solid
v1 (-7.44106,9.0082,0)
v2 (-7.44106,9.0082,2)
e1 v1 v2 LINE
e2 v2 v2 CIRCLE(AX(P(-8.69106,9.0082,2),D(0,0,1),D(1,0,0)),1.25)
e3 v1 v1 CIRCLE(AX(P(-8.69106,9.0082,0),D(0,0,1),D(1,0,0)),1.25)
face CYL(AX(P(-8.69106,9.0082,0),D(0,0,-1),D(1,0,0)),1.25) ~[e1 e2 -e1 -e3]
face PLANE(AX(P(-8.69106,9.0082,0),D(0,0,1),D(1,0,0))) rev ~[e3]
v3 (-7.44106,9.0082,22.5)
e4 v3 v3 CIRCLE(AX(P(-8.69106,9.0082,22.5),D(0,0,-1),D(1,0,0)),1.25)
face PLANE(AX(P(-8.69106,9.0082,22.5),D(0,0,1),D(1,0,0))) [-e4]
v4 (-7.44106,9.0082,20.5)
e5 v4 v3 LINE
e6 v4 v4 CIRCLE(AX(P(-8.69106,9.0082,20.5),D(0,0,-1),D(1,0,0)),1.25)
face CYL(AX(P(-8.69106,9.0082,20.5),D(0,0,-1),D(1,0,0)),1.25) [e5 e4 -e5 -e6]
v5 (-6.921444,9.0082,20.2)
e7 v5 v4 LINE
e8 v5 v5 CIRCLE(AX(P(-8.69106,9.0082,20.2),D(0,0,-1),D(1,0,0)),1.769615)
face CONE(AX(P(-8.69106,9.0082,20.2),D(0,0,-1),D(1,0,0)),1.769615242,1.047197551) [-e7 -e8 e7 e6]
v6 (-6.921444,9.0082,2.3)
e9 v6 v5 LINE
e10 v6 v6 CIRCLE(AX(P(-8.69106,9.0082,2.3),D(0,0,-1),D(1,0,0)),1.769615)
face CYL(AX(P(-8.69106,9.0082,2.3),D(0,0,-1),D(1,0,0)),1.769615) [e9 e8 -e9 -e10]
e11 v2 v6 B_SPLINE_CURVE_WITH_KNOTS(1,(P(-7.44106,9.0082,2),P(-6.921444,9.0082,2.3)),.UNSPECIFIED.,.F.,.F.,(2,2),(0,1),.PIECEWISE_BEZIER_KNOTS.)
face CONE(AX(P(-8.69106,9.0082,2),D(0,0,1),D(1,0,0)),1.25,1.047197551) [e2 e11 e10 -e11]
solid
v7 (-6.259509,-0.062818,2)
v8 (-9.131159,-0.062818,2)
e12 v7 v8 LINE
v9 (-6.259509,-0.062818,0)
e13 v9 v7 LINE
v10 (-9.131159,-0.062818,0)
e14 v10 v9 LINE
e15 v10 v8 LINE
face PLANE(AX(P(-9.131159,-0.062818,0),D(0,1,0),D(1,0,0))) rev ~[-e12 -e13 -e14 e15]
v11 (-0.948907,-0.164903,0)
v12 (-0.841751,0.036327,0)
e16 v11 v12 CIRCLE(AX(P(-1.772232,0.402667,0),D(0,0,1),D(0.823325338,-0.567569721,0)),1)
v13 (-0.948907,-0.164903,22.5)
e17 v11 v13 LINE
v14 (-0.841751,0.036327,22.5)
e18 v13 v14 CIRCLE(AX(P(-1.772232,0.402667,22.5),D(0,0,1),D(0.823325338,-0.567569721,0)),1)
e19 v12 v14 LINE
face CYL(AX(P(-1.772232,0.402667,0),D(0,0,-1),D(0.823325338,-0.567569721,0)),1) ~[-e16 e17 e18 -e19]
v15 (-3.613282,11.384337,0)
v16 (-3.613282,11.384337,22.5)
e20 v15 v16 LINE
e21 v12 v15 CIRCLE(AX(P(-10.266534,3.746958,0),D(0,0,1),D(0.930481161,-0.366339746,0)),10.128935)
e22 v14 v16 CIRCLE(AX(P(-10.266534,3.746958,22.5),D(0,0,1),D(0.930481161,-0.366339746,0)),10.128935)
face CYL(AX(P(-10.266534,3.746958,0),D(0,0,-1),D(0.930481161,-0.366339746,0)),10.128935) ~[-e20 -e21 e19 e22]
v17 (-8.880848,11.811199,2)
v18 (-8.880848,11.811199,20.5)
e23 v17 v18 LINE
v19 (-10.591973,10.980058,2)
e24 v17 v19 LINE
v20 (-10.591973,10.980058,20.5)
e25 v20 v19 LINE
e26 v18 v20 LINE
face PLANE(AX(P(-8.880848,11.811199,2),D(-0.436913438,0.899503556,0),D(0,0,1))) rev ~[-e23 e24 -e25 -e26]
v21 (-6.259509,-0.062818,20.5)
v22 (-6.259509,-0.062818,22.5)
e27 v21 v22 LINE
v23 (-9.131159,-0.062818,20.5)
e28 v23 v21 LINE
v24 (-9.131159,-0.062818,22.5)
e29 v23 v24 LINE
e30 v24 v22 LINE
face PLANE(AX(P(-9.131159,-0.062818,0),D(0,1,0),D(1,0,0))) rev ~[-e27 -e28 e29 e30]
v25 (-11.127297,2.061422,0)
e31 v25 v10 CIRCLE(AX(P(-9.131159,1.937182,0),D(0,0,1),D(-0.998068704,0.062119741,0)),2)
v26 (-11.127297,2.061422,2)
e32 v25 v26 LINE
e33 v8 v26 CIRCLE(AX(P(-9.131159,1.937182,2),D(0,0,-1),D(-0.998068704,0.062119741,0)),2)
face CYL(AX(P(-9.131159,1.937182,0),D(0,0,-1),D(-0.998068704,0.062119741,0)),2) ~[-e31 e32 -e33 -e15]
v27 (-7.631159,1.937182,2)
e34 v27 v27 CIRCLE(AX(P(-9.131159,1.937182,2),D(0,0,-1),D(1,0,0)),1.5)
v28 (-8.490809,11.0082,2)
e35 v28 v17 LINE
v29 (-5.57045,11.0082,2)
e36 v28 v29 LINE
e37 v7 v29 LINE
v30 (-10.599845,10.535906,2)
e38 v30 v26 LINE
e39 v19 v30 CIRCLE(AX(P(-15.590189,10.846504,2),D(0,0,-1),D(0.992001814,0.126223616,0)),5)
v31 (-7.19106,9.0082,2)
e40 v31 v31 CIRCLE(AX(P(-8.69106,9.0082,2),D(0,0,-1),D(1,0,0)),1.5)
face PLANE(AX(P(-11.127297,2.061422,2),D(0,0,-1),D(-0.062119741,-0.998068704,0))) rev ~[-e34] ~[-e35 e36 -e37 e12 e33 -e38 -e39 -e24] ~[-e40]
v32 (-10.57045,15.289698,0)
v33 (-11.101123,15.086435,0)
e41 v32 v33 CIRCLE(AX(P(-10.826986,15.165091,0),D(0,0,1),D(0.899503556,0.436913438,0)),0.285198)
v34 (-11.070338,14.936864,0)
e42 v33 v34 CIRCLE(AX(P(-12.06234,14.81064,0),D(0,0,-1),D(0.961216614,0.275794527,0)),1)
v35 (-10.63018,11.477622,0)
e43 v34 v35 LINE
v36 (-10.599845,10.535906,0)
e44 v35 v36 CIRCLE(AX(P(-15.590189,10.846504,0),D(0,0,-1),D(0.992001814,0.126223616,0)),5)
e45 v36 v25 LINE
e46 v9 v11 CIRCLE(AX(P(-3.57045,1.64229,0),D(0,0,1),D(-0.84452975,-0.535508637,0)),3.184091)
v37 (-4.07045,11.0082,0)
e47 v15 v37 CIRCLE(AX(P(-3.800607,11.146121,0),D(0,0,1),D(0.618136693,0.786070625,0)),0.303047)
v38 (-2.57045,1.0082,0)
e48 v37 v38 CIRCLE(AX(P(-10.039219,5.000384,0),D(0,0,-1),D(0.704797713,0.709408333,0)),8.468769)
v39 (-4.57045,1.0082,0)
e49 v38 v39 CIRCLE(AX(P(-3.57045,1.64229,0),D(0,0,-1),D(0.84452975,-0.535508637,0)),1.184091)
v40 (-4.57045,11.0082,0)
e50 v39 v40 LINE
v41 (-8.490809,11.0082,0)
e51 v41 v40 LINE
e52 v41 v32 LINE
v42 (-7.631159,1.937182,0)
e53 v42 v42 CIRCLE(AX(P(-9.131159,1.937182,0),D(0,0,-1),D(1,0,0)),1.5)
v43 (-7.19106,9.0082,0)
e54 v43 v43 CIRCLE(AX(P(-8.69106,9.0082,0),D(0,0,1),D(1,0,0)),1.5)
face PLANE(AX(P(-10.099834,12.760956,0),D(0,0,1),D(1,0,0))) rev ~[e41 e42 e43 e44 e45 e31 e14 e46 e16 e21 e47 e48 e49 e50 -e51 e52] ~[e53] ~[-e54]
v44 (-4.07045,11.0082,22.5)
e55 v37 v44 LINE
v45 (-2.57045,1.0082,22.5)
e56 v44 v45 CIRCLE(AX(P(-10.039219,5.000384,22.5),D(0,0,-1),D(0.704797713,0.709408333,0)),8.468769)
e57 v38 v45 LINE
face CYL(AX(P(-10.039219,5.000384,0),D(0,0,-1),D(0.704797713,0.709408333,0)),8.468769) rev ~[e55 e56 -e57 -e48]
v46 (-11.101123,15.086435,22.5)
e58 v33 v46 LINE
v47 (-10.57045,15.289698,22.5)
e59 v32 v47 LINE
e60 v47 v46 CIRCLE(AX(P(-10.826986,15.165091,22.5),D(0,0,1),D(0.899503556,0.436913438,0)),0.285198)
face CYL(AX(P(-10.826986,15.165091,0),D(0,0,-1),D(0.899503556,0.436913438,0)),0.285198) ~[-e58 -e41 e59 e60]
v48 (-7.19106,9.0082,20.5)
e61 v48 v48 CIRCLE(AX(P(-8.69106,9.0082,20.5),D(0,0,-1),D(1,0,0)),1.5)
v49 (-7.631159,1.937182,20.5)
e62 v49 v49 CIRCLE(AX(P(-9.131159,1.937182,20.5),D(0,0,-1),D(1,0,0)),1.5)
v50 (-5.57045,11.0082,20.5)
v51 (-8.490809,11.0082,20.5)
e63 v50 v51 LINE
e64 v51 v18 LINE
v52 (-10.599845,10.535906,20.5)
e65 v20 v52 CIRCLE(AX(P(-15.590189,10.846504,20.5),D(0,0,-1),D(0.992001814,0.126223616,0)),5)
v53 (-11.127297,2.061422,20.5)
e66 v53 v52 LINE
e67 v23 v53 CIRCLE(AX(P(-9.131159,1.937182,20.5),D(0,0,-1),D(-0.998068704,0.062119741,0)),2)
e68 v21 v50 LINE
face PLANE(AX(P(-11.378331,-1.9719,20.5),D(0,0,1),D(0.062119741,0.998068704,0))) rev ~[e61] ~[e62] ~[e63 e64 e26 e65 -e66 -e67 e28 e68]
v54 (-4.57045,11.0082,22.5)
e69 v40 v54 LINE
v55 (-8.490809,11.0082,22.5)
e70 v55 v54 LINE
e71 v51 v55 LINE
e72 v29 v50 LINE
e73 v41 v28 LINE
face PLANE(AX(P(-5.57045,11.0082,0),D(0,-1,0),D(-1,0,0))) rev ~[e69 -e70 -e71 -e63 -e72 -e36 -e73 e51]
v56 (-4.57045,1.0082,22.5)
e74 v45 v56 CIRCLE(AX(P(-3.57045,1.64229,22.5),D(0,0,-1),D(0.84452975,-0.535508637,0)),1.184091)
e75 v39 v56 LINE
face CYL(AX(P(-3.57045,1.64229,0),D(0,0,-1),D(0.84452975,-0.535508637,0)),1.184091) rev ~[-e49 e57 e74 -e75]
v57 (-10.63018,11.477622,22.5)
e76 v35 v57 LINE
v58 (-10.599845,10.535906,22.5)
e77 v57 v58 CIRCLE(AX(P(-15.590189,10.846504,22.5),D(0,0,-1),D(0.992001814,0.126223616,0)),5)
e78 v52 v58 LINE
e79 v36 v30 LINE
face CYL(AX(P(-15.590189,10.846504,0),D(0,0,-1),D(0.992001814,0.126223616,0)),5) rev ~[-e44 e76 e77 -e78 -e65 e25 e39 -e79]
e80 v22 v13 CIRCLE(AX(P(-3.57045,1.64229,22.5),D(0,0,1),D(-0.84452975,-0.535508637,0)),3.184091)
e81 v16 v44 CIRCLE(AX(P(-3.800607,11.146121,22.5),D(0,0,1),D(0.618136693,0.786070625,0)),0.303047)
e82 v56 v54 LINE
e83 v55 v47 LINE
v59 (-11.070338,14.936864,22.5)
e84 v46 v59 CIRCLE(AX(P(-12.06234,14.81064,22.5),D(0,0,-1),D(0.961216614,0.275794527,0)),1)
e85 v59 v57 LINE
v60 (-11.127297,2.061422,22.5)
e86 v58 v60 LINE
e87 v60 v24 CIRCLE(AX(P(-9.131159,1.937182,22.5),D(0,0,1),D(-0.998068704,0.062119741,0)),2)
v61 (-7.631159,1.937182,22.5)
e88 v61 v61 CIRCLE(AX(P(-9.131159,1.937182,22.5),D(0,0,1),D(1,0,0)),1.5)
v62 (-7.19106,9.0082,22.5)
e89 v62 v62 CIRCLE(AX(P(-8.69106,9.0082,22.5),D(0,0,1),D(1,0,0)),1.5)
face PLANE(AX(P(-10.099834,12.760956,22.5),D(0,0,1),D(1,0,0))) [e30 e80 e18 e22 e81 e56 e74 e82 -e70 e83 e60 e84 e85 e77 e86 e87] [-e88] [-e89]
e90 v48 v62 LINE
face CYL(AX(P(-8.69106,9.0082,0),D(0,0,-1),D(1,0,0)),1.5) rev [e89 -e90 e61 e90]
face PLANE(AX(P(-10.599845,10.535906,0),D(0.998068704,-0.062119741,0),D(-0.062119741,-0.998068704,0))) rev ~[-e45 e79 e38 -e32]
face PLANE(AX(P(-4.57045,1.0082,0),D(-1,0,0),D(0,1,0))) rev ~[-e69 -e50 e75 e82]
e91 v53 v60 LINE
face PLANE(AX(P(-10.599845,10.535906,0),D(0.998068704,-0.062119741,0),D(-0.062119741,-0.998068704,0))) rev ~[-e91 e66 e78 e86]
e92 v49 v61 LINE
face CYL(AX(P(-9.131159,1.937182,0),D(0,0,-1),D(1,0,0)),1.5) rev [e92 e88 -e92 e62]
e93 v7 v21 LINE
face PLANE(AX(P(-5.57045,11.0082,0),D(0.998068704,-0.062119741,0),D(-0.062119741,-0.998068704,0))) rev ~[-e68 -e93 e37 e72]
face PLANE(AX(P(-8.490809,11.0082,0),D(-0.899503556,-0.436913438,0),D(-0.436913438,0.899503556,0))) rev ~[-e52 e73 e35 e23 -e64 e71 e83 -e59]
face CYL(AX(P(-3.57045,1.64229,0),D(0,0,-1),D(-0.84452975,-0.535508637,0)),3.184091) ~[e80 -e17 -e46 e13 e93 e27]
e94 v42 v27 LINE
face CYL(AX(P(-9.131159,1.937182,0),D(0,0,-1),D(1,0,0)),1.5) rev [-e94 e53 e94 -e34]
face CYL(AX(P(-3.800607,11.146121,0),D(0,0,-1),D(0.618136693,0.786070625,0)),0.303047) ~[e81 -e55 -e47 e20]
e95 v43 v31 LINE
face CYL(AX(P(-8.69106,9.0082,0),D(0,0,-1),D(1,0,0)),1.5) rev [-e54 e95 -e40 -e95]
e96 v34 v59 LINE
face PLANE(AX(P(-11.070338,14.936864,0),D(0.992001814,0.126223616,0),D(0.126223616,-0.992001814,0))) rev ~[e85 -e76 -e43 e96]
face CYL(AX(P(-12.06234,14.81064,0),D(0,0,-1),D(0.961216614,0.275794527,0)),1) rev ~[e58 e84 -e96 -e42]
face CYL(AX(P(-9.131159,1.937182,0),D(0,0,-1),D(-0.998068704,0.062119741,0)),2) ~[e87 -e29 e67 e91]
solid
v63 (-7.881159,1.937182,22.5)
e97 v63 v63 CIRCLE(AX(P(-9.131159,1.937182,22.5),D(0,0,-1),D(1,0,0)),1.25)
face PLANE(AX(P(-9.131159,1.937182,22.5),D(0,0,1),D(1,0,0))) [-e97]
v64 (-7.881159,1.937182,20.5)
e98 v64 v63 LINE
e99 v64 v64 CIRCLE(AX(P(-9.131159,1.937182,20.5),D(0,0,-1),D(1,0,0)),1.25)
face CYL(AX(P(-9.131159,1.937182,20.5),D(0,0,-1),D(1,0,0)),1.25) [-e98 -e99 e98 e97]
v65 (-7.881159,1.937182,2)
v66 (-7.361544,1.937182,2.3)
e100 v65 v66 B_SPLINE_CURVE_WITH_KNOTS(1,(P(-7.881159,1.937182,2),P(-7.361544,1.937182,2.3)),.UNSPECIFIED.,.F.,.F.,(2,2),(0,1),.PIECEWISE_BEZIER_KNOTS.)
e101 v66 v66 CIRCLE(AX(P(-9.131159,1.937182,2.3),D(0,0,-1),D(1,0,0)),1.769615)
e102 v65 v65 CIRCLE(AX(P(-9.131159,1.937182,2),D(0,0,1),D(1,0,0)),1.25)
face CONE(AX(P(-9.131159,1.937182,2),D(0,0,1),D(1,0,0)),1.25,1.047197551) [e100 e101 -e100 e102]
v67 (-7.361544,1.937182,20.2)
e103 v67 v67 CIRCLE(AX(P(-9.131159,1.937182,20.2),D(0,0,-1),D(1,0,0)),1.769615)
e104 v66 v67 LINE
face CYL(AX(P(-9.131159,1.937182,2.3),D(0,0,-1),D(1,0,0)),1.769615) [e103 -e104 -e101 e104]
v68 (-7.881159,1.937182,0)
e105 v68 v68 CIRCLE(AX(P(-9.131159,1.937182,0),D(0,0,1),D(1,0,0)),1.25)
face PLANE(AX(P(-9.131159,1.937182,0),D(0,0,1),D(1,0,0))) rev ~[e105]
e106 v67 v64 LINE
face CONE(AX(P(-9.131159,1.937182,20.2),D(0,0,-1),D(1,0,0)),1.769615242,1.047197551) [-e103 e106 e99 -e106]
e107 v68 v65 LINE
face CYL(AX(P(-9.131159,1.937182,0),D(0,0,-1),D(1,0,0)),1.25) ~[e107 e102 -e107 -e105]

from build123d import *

# Parameters (mm, degrees)
F0_R      = 1.5
F1_DEPTH  = 22.5
F2_W      = 1.5649868256
F2_H      = 18.5
F2_W_2    = 8.4908823588
F2_H_2    = 2
F2_W_3    = 4.0411260356
F3_DEPTH  = 25
F4_DEPTH  = 22.5
F5_DEPTH  = 2
F0_R_2    = 1.25
F5_FACE_R = 1.25
F6_DEPTH  = 0.3
F6_TAPER  = -60
F7_DEPTH  = 17.9
F7_FACE_R = 1.7696152423
F8_DEPTH  = 0.3
F8_TAPER  = 60
F9_DEPTH  = 2
F10_W     = 0.8927135028
F10_H     = 18.5
F11_DEPTH = 25


with BuildPart() as f1:
    # F0 (on Top) → F1 (new body)
    with BuildSketch(Plane.XY):
        with BuildLine():
            Line((-6.2595093475, -0.0628177289), (-5.5704498465, 11.0081995456))
            Line((-5.5704498465, 11.0081995456), (-8.4908092394, 11.0081995456))
            ThreePointArc((-8.4908092394, 11.0081995456), (-9.5714450422, 10.8886817815), (-10.599845389, 10.5359057038))
            Line((-10.599845389, 10.5359057038), (-11.1272968, 2.0614217526))
            ThreePointArc((-11.1272968, 2.0614217526), (-10.5886364868, 0.5675982034), (-9.1311593921, -0.0628177289))
            Line((-9.1311593921, -0.0628177289), (-6.2595093475, -0.0628177289))
        make_face()
        with Locations((-9.1311593921, 1.9371822711)):
            Circle(F0_R, mode=Mode.SUBTRACT)
        with Locations((-8.6910596692, 9.0081995456)):
            Circle(F0_R, mode=Mode.SUBTRACT)
    extrude(amount=F1_DEPTH)

    # F2 (on face) → F3 (cut)
    with BuildSketch(Plane(origin=(-11.2121657678, 0.6978445754, 0), x_dir=(-0.0621197408, -0.998068704, 0), z_dir=(-0.998068704, 0.0621197408, 0))):
        with Locations((-10.6395915159, 11.25)):
            Rectangle(F2_W, F2_H)
        with Locations((-5.6116569237, 11.25)):
            Rectangle(F2_W_2, F2_H)
        with Locations((-5.6116569237, 1)):
            Rectangle(F2_W_2, F2_H_2)
        with Locations((0.6543472735, 11.25)):
            Rectangle(F2_W_3, F2_H)
    extrude(amount=-F3_DEPTH, mode=Mode.SUBTRACT)

    # F0 (on Top) → F4 (join)
    with BuildSketch(Plane.XY):
        with BuildLine():
            ThreePointArc((-10.599845389, 10.5359057038), (-9.5714450422, 10.8886817815), (-8.4908092394, 11.0081995456))
            Line((-8.4908092394, 11.0081995456), (-10.5704498465, 15.2896977961))
            ThreePointArc((-10.5704498465, 15.2896977961), (-10.9289981735, 15.4314206404), (-11.1011234826, 15.0864349228))
            ThreePointArc((-11.1011234826, 15.0864349228), (-11.0828716583, 15.0122379619), (-11.0703382822, 14.9368640104))
            Line((-11.0703382822, 14.9368640104), (-10.6301798393, 11.4776224879))
            ThreePointArc((-10.6301798393, 11.4776224879), (-10.5927809018, 11.0074802207), (-10.599845389, 10.5359057038))
        make_face()
        with BuildLine():
            Line((-4.5704498465, 1.0081995456), (-4.5704498465, 11.0081995456))
            Line((-4.5704498465, 11.0081995456), (-5.5704498465, 11.0081995456))
            Line((-5.5704498465, 11.0081995456), (-6.2595093475, -0.0628177289))
            ThreePointArc((-6.2595093475, -0.0628177289), (-3.6316461386, -1.5412123224), (-0.9489071219, -0.1649031322))
            ThreePointArc((-0.9489071219, -0.1649031322), (-0.8895758539, -0.0673518323), (-0.8417512995, 0.0363268419))
            ThreePointArc((-0.8417512995, 0.0363268419), (-0.4268119196, 6.1501192436), (-3.6132824607, 11.3843372092))
            ThreePointArc((-3.6132824607, 11.3843372092), (-3.9931483806, 11.3801406851), (-4.0704498465, 11.0081995456))
            ThreePointArc((-4.0704498465, 11.0081995456), (-1.6641453193, 6.2566452246), (-2.5704498465, 1.0081995456))
            ThreePointArc((-2.5704498465, 1.0081995456), (-3.5704498465, 0.4581995456), (-4.5704498465, 1.0081995456))
        make_face()
    extrude(amount=F4_DEPTH)

    # F0 (on Top) → F5 (join)
    with BuildSketch(Plane.XY):
        with BuildLine():
            Line((-6.2595093475, -0.0628177289), (-5.5704498465, 11.0081995456))
            Line((-5.5704498465, 11.0081995456), (-8.4908092394, 11.0081995456))
            ThreePointArc((-8.4908092394, 11.0081995456), (-9.5714450422, 10.8886817815), (-10.599845389, 10.5359057038))
            Line((-10.599845389, 10.5359057038), (-11.1272968, 2.0614217526))
            ThreePointArc((-11.1272968, 2.0614217526), (-10.5886364868, 0.5675982034), (-9.1311593921, -0.0628177289))
            Line((-9.1311593921, -0.0628177289), (-6.2595093475, -0.0628177289))
        make_face()
        with Locations((-9.1311593921, 1.9371822711)):
            Circle(F0_R, mode=Mode.SUBTRACT)
        with Locations((-8.6910596692, 9.0081995456)):
            Circle(F0_R, mode=Mode.SUBTRACT)
    extrude(amount=F5_DEPTH)

    # F10 (on face) → F11 (cut)
    with BuildSketch(Plane(origin=(-2.5436906285, -1.235539994, 0), x_dir=(-0.4369134382, 0.8995035561, 0), z_dir=(0.8995035561, 0.4369134382, 0))):
        with Locations((14.0580200475, 11.25)):
            Rectangle(F10_W, F10_H)
    extrude(amount=-F11_DEPTH, mode=Mode.SUBTRACT)


with BuildPart() as f5:
    # F0 (on Top) → F5, piece 2 (new body)
    with BuildSketch(Plane.XY):
        with Locations((-9.1311593921, 1.9371822711)):
            Circle(F0_R_2)
    extrude(amount=F5_DEPTH)

    # F5_face (on face) → F6, piece 2 (join)
    with BuildSketch(Plane(origin=(-8.6910596692, 9.0081995456, 2), x_dir=(1, 0, 0), z_dir=(0, 0, 1))):
        with Locations((-0.4400997229, -7.0710172745)):
            Circle(F5_FACE_R)
    extrude(amount=F6_DEPTH, taper=F6_TAPER)

    # F7#2 (add): a face of the model
    f7_2_faces = [f5.faces().sort_by_distance(p)[0] for p in [
        (-9.1311593921, 1.9371822711, 2.3),
    ]]
    extrude(f7_2_faces, amount=F7_DEPTH)

    # F7_face (on face) → F8, piece 2 (join)
    with BuildSketch(Plane(origin=(-8.6910596692, 9.0081995456, 20.2), x_dir=(1, 0, 0), z_dir=(0, 0, 1))):
        with Locations((-0.4400997229, -7.0710172745)):
            Circle(F7_FACE_R)
    extrude(amount=F8_DEPTH, taper=F8_TAPER)

    # F9#2 (add): a face of the model
    f9_2_faces = [f5.faces().sort_by_distance(p)[0] for p in [
        (-9.1311593921, 1.9371822711, 20.5),
    ]]
    extrude(f9_2_faces, amount=F9_DEPTH)


with BuildPart() as f5b:
    # F0 (on Top) → F5, piece 3 (new body)
    with BuildSketch(Plane.XY):
        with Locations((-8.6910596692, 9.0081995456)):
            Circle(F0_R_2)
    extrude(amount=F5_DEPTH)

    # F5_face (on face) → F6 (join)
    with BuildSketch(Plane(origin=(-8.6910596692, 9.0081995456, 2), x_dir=(1, 0, 0), z_dir=(0, 0, 1))):
        Circle(F5_FACE_R)
    extrude(amount=F6_DEPTH, taper=F6_TAPER)

    # F7 (add): a face of the model
    f7_faces = [f5b.faces().sort_by_distance(p)[0] for p in [
        (-8.6910596692, 9.0081995456, 2.3),
    ]]
    extrude(f7_faces, amount=F7_DEPTH)

    # F7_face (on face) → F8 (join)
    with BuildSketch(Plane(origin=(-8.6910596692, 9.0081995456, 20.2), x_dir=(1, 0, 0), z_dir=(0, 0, 1))):
        Circle(F7_FACE_R)
    extrude(amount=F8_DEPTH, taper=F8_TAPER)

    # F9 (add): a face of the model
    f9_faces = [f5b.faces().sort_by_distance(p)[0] for p in [
        (-8.6910596692, 9.0081995456, 20.5),
    ]]
    extrude(f9_faces, amount=F9_DEPTH)


solid = Compound([f1.part, f5.part, f5b.part])
